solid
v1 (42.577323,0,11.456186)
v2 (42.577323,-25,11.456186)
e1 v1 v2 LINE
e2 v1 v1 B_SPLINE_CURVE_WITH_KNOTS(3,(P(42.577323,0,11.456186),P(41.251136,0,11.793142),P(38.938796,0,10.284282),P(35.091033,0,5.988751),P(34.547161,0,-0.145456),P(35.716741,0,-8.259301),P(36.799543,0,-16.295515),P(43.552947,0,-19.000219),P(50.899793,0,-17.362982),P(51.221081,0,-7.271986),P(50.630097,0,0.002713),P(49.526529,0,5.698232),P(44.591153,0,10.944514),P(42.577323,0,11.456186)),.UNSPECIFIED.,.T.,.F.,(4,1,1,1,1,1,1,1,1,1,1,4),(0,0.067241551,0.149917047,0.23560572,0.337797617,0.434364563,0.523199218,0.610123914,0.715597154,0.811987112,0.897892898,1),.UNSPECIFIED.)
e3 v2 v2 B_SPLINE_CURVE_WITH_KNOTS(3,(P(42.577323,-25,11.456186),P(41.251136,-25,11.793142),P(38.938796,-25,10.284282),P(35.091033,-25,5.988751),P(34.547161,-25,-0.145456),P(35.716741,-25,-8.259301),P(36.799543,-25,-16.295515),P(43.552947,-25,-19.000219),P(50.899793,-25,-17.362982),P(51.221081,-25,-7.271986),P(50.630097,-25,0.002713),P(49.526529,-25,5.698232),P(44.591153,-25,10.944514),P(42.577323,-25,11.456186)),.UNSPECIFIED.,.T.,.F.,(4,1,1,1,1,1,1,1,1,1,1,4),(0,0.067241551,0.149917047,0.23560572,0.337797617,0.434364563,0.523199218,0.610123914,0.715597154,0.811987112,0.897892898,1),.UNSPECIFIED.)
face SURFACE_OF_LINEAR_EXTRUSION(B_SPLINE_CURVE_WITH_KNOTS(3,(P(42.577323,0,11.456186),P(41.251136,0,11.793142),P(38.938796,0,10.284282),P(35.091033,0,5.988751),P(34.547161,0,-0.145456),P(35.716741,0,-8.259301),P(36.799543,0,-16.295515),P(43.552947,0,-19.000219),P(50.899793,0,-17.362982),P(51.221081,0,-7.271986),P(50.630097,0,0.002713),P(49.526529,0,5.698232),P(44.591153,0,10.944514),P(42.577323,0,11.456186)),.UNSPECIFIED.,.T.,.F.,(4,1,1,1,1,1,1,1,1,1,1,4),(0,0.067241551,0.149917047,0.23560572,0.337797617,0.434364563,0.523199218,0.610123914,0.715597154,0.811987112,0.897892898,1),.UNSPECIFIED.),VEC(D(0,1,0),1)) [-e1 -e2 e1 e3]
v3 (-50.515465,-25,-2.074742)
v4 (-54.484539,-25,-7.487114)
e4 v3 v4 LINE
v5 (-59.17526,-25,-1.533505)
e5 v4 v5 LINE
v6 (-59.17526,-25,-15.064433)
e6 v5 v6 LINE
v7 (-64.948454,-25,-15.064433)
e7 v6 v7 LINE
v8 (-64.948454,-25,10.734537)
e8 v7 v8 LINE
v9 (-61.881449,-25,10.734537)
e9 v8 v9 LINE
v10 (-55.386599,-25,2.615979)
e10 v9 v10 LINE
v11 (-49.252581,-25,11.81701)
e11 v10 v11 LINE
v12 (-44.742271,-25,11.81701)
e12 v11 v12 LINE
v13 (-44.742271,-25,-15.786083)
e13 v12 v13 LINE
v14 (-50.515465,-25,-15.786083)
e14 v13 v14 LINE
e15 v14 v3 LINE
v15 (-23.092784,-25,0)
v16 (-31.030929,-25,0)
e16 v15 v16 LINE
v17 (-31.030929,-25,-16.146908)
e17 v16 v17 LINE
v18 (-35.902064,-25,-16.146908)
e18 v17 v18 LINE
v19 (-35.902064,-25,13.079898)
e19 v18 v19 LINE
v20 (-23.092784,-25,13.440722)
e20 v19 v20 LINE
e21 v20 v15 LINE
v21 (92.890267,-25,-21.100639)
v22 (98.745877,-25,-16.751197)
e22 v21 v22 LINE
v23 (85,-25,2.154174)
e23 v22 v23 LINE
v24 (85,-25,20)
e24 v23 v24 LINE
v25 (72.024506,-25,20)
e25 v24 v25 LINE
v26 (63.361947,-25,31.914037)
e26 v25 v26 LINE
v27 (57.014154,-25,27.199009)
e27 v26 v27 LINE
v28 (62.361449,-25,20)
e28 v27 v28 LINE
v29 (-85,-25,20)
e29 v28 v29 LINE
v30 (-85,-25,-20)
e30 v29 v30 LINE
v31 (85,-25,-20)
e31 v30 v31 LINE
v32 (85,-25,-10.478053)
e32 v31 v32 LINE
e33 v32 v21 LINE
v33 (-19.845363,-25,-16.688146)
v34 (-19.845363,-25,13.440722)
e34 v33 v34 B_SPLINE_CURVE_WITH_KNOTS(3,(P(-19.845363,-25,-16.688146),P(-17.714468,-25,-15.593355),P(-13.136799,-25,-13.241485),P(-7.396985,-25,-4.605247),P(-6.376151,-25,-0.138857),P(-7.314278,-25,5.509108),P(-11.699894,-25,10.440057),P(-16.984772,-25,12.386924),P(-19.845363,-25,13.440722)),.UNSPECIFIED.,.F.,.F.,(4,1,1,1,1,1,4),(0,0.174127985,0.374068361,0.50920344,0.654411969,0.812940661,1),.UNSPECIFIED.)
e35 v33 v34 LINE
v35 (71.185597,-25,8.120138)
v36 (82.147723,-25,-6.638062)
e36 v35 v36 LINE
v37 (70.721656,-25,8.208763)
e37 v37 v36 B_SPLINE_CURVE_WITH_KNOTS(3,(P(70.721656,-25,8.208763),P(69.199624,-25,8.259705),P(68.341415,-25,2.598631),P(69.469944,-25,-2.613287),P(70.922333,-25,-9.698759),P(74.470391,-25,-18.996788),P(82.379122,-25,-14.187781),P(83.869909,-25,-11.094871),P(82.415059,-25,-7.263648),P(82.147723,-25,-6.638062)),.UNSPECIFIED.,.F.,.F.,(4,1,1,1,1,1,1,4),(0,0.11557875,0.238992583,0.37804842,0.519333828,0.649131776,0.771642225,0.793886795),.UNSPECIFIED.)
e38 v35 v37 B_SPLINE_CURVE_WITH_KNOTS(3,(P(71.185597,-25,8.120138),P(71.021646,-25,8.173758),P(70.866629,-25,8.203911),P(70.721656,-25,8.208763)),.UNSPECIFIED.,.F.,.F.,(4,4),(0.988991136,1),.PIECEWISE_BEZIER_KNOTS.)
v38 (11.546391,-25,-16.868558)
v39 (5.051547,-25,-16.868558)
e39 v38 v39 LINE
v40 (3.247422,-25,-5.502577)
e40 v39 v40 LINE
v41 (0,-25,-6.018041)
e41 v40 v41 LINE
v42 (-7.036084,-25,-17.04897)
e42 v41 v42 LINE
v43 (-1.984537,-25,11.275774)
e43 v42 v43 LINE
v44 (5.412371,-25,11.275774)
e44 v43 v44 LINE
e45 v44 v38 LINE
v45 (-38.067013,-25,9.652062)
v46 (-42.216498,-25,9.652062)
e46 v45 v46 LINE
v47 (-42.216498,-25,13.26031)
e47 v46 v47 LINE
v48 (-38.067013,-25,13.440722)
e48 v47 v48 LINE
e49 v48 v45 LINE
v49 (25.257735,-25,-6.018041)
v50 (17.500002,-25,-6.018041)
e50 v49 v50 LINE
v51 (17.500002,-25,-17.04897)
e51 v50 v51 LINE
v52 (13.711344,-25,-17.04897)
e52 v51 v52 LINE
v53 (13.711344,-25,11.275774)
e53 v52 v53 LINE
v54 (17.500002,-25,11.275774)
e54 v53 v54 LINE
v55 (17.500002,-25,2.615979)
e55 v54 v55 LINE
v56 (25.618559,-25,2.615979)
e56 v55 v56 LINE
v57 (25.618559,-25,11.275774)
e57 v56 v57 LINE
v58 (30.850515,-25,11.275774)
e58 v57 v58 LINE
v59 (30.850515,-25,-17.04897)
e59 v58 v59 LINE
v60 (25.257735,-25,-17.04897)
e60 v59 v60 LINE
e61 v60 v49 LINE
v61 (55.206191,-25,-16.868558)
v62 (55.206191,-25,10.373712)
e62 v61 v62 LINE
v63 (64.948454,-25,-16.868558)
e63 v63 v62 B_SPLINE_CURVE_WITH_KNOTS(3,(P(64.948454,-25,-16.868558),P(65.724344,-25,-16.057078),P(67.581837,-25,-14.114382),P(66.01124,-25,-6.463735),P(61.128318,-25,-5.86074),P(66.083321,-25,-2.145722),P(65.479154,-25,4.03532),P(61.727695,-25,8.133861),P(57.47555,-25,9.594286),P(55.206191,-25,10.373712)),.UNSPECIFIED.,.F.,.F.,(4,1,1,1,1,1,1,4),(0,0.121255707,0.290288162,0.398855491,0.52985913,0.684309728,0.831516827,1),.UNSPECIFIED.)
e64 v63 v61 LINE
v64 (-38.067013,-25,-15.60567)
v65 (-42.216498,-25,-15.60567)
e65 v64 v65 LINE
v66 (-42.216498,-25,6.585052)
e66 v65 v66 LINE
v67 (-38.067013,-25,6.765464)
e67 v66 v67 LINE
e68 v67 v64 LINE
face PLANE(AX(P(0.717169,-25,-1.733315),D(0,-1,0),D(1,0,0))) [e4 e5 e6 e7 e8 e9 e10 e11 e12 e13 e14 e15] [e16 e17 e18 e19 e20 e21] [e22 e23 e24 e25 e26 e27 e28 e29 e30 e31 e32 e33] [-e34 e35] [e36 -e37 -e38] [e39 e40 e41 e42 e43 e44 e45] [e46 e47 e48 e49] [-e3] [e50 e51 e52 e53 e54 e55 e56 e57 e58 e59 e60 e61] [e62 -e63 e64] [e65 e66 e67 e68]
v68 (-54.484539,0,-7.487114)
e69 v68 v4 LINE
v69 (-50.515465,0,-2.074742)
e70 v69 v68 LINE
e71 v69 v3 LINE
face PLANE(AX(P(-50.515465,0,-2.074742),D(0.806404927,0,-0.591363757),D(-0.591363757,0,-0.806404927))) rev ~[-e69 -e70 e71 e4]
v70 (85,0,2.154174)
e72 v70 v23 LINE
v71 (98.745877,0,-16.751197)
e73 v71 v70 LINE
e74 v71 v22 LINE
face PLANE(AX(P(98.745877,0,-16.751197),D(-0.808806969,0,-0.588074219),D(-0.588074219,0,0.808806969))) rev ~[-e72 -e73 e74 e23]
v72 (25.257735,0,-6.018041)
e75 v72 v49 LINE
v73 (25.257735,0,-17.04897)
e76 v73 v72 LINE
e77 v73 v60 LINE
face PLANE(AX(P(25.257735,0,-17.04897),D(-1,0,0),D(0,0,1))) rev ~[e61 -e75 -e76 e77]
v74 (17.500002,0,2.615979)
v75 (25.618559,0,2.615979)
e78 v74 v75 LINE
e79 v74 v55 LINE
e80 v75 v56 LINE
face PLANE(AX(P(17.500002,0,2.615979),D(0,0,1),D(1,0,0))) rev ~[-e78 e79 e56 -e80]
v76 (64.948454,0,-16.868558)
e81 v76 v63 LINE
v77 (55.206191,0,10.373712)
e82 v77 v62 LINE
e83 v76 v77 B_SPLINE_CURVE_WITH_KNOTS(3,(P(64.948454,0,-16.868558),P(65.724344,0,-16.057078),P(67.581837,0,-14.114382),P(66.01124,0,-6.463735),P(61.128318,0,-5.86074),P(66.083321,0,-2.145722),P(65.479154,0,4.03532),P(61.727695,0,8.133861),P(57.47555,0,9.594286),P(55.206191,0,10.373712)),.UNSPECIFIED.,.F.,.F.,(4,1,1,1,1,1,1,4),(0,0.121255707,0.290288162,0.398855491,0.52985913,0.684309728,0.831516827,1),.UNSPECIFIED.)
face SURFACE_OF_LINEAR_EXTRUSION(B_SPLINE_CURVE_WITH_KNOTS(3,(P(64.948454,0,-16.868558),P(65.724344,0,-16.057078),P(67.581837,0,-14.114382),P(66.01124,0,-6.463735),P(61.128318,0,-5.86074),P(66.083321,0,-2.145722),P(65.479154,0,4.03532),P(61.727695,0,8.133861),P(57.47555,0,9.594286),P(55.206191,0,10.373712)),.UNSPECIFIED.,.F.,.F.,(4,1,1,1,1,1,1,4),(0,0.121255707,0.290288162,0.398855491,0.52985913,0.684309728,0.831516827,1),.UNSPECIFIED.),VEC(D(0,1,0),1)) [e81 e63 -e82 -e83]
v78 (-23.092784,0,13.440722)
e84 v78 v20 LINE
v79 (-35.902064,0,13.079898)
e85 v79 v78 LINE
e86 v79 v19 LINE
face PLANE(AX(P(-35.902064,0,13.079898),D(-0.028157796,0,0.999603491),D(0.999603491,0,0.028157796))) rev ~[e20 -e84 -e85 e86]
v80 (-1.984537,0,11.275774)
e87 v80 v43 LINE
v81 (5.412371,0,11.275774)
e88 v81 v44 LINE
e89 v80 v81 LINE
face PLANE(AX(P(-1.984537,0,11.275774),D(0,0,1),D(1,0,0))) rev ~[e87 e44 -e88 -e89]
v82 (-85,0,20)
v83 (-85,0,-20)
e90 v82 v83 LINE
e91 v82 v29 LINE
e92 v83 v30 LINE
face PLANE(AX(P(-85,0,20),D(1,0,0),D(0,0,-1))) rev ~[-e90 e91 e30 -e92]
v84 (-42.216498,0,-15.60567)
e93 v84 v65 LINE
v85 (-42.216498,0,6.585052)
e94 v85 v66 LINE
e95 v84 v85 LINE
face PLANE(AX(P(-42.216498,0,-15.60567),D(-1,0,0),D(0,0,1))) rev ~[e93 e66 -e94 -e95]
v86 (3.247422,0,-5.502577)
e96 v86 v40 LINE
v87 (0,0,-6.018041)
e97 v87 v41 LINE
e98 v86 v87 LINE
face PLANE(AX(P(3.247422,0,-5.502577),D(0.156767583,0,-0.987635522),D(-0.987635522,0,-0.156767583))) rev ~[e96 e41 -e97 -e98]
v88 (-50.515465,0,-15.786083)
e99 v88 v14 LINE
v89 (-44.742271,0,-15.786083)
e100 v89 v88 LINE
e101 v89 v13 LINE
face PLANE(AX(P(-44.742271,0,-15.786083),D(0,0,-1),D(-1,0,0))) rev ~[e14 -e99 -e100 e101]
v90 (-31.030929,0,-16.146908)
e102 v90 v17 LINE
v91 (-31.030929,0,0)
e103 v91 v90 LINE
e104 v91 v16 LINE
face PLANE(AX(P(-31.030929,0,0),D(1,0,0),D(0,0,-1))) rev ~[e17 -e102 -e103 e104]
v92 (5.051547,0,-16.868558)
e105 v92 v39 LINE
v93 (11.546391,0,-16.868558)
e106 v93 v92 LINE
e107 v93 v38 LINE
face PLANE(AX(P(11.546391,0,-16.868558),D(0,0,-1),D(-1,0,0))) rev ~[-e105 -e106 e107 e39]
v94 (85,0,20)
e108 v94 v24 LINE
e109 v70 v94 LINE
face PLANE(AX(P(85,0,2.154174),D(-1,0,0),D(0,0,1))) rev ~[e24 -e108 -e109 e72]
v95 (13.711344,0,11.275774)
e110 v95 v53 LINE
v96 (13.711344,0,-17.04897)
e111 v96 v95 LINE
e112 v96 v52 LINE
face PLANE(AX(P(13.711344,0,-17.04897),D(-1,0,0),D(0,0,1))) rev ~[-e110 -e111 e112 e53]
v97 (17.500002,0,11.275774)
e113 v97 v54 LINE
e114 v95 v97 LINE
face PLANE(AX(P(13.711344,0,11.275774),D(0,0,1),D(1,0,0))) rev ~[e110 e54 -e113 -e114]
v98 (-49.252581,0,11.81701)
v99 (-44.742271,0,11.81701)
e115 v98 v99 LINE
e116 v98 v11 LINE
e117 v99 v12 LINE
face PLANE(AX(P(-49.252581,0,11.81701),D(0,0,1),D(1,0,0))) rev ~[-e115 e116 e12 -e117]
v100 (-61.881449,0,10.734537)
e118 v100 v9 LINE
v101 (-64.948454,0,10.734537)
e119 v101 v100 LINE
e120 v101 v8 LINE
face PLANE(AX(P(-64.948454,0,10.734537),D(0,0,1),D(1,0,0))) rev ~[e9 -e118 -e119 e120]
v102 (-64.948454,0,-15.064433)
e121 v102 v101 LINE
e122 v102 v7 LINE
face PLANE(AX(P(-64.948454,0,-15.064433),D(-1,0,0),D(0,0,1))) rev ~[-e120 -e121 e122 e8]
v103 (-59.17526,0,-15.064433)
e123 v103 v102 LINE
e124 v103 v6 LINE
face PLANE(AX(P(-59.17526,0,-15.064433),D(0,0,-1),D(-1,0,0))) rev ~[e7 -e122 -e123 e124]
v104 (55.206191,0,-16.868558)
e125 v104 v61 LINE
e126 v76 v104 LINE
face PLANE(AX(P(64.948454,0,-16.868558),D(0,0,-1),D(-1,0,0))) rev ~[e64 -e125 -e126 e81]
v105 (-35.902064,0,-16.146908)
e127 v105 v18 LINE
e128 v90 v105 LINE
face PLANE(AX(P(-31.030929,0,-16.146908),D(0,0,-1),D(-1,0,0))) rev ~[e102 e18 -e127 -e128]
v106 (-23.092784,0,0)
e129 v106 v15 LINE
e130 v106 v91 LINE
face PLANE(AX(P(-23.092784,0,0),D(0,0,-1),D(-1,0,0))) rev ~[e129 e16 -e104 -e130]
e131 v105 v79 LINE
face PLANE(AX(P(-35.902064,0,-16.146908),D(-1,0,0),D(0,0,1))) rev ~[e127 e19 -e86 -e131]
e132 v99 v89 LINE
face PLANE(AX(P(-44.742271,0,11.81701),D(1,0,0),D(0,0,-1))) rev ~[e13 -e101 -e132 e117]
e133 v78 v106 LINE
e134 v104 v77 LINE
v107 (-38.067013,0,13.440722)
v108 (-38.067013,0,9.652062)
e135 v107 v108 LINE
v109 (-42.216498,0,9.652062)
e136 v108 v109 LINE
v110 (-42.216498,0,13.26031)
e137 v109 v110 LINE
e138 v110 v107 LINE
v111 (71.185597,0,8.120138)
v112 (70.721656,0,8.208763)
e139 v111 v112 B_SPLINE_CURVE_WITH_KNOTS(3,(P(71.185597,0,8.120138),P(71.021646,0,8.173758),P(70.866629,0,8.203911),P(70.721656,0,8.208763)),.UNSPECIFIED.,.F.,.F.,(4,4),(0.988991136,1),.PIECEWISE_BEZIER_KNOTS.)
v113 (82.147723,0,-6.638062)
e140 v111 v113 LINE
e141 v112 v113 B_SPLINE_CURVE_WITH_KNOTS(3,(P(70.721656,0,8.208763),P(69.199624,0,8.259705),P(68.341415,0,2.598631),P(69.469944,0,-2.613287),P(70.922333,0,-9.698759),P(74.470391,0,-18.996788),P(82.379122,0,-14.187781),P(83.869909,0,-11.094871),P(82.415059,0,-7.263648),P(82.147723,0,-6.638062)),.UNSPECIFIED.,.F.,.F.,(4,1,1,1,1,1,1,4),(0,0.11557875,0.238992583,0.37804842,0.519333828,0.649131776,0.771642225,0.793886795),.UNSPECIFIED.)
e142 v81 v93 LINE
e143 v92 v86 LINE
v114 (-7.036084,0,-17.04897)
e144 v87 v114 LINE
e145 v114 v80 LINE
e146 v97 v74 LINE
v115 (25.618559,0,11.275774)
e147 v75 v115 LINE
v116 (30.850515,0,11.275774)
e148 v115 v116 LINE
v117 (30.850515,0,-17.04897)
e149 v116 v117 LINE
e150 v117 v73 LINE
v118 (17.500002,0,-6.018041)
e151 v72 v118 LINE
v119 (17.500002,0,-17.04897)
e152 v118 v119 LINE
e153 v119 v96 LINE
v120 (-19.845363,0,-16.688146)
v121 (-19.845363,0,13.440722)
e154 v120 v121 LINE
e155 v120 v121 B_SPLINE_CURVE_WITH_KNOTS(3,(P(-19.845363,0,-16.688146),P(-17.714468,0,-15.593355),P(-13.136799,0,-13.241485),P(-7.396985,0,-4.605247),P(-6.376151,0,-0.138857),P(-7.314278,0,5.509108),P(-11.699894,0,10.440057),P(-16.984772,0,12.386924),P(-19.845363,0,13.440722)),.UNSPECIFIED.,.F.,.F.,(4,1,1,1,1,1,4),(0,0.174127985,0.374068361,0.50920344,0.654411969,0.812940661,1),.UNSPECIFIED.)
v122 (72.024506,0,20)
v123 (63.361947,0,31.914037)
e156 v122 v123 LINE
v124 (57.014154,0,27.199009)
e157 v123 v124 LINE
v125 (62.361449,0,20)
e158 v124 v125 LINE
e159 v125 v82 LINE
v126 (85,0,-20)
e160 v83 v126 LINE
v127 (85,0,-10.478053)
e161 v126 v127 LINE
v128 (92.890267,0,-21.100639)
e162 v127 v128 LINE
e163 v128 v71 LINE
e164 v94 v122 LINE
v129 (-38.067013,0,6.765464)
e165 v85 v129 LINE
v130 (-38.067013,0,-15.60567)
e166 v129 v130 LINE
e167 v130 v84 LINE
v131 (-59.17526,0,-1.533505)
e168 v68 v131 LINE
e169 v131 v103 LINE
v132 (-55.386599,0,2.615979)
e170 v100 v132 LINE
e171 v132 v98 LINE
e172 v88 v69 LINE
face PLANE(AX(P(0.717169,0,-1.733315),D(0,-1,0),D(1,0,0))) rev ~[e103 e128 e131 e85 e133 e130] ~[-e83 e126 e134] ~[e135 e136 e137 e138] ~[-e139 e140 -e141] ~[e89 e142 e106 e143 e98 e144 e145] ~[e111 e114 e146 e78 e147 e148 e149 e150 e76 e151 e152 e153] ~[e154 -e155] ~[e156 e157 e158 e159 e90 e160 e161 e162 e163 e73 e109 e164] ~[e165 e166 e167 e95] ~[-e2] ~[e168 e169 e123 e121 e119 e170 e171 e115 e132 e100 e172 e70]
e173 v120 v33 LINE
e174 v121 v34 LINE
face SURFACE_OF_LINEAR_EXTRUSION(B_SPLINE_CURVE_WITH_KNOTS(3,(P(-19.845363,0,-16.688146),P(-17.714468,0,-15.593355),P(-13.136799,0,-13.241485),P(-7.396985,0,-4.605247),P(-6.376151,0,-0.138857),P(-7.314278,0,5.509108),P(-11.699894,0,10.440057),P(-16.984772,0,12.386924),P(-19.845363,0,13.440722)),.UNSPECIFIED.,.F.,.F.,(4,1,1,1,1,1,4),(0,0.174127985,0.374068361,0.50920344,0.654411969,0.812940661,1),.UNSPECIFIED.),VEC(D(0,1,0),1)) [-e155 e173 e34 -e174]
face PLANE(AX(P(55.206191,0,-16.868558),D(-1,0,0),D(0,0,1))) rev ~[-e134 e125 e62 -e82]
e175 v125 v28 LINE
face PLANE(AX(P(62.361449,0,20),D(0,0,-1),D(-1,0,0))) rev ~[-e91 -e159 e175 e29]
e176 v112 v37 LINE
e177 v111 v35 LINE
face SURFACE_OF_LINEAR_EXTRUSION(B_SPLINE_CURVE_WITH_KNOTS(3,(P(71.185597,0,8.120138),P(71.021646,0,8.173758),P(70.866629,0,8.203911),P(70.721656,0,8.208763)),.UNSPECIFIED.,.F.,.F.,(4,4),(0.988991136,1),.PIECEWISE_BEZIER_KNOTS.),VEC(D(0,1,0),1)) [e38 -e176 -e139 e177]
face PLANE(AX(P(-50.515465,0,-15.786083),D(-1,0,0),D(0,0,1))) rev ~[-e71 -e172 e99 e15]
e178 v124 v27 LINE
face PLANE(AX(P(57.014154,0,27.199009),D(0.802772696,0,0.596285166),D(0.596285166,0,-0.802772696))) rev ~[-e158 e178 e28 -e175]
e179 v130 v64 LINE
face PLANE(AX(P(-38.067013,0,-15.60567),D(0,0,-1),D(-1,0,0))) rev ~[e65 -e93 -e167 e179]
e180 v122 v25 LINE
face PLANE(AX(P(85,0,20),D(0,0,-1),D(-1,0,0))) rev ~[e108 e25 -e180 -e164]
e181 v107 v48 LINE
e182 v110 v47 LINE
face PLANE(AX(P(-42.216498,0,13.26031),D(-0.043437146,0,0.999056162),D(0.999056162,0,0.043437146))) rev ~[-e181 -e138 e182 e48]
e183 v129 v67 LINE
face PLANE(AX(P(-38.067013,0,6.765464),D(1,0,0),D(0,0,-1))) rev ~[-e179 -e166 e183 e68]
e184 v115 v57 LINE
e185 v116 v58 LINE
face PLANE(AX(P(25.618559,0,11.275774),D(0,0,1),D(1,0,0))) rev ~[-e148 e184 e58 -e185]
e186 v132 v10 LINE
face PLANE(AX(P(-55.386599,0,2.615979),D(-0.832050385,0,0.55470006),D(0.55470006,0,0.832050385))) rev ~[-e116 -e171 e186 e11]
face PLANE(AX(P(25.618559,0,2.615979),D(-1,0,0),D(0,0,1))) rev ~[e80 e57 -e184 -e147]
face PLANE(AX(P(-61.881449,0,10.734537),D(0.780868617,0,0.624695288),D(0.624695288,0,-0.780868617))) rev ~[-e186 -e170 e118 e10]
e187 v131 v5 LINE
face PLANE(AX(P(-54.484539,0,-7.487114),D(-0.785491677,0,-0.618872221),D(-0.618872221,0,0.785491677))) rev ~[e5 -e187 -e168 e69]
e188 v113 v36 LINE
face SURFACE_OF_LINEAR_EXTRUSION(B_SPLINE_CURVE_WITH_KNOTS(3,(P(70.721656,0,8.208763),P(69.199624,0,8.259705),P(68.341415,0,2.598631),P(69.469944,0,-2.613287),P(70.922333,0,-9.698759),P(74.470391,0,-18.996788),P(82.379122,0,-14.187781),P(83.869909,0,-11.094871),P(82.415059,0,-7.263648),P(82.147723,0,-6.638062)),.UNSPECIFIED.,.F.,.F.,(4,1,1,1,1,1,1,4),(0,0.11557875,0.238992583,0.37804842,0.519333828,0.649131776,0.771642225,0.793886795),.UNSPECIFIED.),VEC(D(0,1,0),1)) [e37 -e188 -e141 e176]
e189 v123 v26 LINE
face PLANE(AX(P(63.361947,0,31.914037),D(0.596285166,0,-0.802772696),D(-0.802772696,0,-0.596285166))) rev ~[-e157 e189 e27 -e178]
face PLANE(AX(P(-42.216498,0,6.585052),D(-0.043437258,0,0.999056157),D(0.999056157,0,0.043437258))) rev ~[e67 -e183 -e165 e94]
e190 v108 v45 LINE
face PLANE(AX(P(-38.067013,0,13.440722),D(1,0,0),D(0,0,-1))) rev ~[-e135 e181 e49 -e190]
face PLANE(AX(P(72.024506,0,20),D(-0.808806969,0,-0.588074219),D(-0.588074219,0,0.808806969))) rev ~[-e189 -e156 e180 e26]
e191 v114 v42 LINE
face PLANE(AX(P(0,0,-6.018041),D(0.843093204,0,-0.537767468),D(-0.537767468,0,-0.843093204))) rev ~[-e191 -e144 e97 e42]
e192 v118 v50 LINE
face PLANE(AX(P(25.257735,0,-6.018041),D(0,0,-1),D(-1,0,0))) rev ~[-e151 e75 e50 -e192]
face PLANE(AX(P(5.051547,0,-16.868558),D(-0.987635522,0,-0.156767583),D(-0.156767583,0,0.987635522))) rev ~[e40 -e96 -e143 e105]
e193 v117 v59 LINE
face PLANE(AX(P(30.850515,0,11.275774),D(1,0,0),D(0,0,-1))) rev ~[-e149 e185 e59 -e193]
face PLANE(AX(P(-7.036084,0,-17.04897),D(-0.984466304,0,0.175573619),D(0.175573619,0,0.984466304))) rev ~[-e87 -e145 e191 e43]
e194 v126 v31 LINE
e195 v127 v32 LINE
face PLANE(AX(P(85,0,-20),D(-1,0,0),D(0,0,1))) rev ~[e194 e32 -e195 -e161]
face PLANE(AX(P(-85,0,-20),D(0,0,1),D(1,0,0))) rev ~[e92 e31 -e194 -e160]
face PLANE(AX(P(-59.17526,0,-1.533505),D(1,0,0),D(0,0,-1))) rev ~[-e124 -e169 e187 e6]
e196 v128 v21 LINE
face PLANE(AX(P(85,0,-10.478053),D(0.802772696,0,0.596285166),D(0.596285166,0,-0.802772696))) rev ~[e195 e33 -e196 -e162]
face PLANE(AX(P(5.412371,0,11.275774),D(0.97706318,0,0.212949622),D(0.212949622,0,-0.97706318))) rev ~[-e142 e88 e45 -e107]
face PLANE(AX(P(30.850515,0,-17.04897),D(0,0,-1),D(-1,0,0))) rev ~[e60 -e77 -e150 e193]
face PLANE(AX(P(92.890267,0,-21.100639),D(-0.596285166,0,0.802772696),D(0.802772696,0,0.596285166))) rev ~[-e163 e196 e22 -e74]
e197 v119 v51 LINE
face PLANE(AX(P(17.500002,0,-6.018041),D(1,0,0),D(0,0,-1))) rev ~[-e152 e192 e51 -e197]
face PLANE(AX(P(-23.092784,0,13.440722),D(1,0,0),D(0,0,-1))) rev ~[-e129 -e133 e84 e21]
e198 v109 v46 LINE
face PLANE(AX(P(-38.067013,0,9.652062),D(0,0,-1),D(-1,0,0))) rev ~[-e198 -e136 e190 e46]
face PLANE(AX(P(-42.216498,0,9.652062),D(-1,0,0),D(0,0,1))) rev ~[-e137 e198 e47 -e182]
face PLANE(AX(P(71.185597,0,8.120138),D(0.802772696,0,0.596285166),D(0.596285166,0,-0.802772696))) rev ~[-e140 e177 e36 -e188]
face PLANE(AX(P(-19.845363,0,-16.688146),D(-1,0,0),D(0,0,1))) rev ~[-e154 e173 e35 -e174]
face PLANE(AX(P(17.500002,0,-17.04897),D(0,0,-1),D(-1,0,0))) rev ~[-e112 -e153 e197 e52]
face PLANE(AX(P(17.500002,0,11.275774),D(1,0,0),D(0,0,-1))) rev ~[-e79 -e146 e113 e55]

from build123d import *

# Parameters (mm, degrees)
F1_DEPTH = 25


with BuildPart() as f1:
    # F0 (on Front) → F1 (new body)
    with BuildSketch(Plane.XZ):
        with BuildLine():
            Line((62.3614487217, 20), (-85, 20))
            Line((-85, 20), (-85, -20))
            Line((-85, -20), (85, -20))
            Line((85, -20), (85, -10.4780528988))
            Line((85, -10.4780528988), (82.1477233246, -6.6380616235))
            add(Edge.make_bspline(
                [(70.7216560841, 8.2087628543), (69.1996240001, 8.2597046081), (68.3414146902, 2.5986308379), (69.4699440548, -2.6132865304), (70.92233283, -9.6987587114), (74.4703906649, -18.9967880488), (82.3791215508, -14.1877807655), (83.8699090457, -11.0948710225), (82.4150586587, -7.2636476642), (82.1477233246, -6.6380616235)],
                knots=[0, 0, 0, 0, 0.1155787502, 0.2389925832, 0.3780484198, 0.5193338278, 0.649131776, 0.7716422246, 0.793886795, 0.793886795, 0.793886795, 0.793886795], degree=3))
            add(Edge.make_bspline(
                [(71.1855970771, 8.1201382078), (71.0216461503, 8.1737580141), (70.8666294867, 8.2039106574), (70.7216560841, 8.2087628543)],
                knots=[0.9889911357, 0.9889911357, 0.9889911357, 0.9889911357, 1, 1, 1, 1], degree=3))
            Line((71.1855970771, 8.1201382078), (62.3614487217, 20))
        make_face()
        Polygon((-59.175260365, -15.064433217), (-64.9484544992, -15.064433217), (-64.9484544992, 10.734536685), (-61.8814490736, 10.734536685), (-55.3865991533, 2.615979407), (-49.2525808513, 11.8170101196), (-44.7422713041, 11.8170101196), (-44.7422713041, -15.7860834152), (-50.5154654384, -15.7860834152), (-50.5154654384, -2.0747422241), (-54.484538734, -7.4871135876), (-59.175260365, -1.533505274), align=None, mode=Mode.SUBTRACT)
        Polygon((-42.2164984047, -15.6056704), (-42.2164984047, 6.5850517713), (-38.0670130253, 6.7654643208), (-38.0670130253, -15.6056704), align=None, mode=Mode.SUBTRACT)
        Polygon((-35.9020642936, -16.1469075829), (-35.9020642936, 13.0798975006), (-23.0927839875, 13.4407216683), (-23.0927839875, 0), (-31.0309287161, 0), (-31.0309287161, -16.1469075829), align=None, mode=Mode.SUBTRACT)
        with BuildLine():
            Line((-19.8453627527, -16.6881456971), (-19.8453627527, 13.4407216683))
            add(Edge.make_bspline(
                [(-19.8453627527, -16.6881456971), (-17.7144681467, -15.59335519), (-13.1367992958, -13.2414845773), (-7.3969851182, -4.6052469009), (-6.3761514561, -0.138857195), (-7.3142777848, 5.5091079052), (-11.6998944818, 10.4400572546), (-16.984772428, 12.3869244765), (-19.8453627527, 13.4407216683)],
                knots=[0, 0, 0, 0, 0.174127985, 0.3740683612, 0.5092034405, 0.6544119692, 0.8129406606, 1, 1, 1, 1], degree=3))
        make_face(mode=Mode.SUBTRACT)
        Polygon((0, -6.0180414103), (-7.0360838436, -17.0489698648), (-1.9845368806, 11.275773868), (5.4123713635, 11.275773868), (11.5463910624, -16.868557781), (5.0515467301, -16.868557781), (3.247422399, -5.5025774054), align=None, mode=Mode.SUBTRACT)
        Polygon((13.7113435194, -17.0489698648), (13.7113435194, 11.275773868), (17.5000019372, 11.275773868), (17.5000019372, 2.615979407), (25.6185587496, 2.615979407), (25.6185587496, 11.275773868), (30.8505147696, 11.275773868), (30.8505147696, -17.0489698648), (25.2577345818, -17.0489698648), (25.2577345818, -6.0180414103), (17.5000019372, -6.0180414103), (17.5000019372, -17.0489698648), align=None, mode=Mode.SUBTRACT)
        with BuildLine():
            add(Edge.make_bspline(
                [(42.5773225725, 11.4561859518), (41.2511357888, 11.7931418797), (38.9387958075, 10.2842824948), (35.091033283, 5.9887509835), (34.5471614175, -0.1454559415), (35.716740771, -8.2593014734), (36.7995431786, -16.2955150436), (43.5529467814, -19.0002191266), (50.8997927145, -17.3629815935), (51.221081488, -7.2719863738), (50.6300974225, 0.0027132086), (49.5265289207, 5.6982324977), (44.5911531063, 10.9445143348), (42.5773225725, 11.4561859518)],
                knots=[0, 0, 0, 0, 0.0672415511, 0.1499170468, 0.2356057197, 0.3377976171, 0.4343645634, 0.5231992182, 0.6101239137, 0.7155971541, 0.8119871125, 0.8978928984, 1, 1, 1, 1], degree=3))
        make_face(mode=Mode.SUBTRACT)
        with BuildLine():
            Line((55.2061907947, -16.868557781), (55.2061907947, 10.373711586))
            add(Edge.make_bspline(
                [(64.9484544992, -16.868557781), (65.7243442417, -16.0570779127), (67.5818370767, -14.1143817299), (66.0112398073, -6.4637354468), (61.1283177948, -5.8607397386), (66.0833206675, -2.1457220786), (65.4791538436, 4.0353203529), (61.7276945752, 8.1338607507), (57.4755503841, 9.5942859898), (55.2061907947, 10.373711586)],
                knots=[0, 0, 0, 0, 0.121255707, 0.2902881616, 0.3988554907, 0.5298591304, 0.6843097284, 0.8315168271, 1, 1, 1, 1], degree=3))
            Line((64.9484544992, -16.868557781), (55.2061907947, -16.868557781))
        make_face(mode=Mode.SUBTRACT)
        Polygon((-42.2164984047, 9.6520623192), (-42.2164984047, 13.2603095844), (-38.0670130253, 13.4407216683), (-38.0670130253, 9.6520623192), align=None, mode=Mode.SUBTRACT)
        Polygon((57.0141535595, 27.1990094602), (62.3614487217, 20), (72.0245060165, 20), (63.3619472529, 31.9140368116), align=None)
        with BuildLine():
            Line((72.0245060165, 20), (62.3614487217, 20))
            Line((62.3614487217, 20), (71.1855970771, 8.1201382078))
            add(Edge.make_bspline(
                [(82.1477233246, -6.6380616235), (79.8029586036, -1.1511248386), (74.0912135488, 7.1698624433), (71.1855970771, 8.1201382078)],
                knots=[0.793886795, 0.793886795, 0.793886795, 0.793886795, 0.9889911357, 0.9889911357, 0.9889911357, 0.9889911357], degree=3))
            Line((82.1477233246, -6.6380616235), (85, -10.4780528988))
            Line((85, -10.4780528988), (85, 2.1541743973))
            Line((85, 2.1541743973), (72.0245060165, 20))
        make_face()
        Polygon((85, 20), (72.0245060165, 20), (85, 2.1541743973), align=None)
        with BuildLine():
            add(Edge.make_bspline(
                [(82.1477233246, -6.6380616235), (79.8029586036, -1.1511248386), (74.0912135488, 7.1698624433), (71.1855970771, 8.1201382078)],
                knots=[0.793886795, 0.793886795, 0.793886795, 0.793886795, 0.9889911357, 0.9889911357, 0.9889911357, 0.9889911357], degree=3))
            Line((71.1855970771, 8.1201382078), (82.1477233246, -6.6380616235))
        make_face()
        Polygon((98.7458772189, -16.751196598), (85, 2.1541743973), (85, -10.4780528988), (92.8902666326, -21.1006391613), align=None)
    extrude(amount=F1_DEPTH)


solid = f1.part
